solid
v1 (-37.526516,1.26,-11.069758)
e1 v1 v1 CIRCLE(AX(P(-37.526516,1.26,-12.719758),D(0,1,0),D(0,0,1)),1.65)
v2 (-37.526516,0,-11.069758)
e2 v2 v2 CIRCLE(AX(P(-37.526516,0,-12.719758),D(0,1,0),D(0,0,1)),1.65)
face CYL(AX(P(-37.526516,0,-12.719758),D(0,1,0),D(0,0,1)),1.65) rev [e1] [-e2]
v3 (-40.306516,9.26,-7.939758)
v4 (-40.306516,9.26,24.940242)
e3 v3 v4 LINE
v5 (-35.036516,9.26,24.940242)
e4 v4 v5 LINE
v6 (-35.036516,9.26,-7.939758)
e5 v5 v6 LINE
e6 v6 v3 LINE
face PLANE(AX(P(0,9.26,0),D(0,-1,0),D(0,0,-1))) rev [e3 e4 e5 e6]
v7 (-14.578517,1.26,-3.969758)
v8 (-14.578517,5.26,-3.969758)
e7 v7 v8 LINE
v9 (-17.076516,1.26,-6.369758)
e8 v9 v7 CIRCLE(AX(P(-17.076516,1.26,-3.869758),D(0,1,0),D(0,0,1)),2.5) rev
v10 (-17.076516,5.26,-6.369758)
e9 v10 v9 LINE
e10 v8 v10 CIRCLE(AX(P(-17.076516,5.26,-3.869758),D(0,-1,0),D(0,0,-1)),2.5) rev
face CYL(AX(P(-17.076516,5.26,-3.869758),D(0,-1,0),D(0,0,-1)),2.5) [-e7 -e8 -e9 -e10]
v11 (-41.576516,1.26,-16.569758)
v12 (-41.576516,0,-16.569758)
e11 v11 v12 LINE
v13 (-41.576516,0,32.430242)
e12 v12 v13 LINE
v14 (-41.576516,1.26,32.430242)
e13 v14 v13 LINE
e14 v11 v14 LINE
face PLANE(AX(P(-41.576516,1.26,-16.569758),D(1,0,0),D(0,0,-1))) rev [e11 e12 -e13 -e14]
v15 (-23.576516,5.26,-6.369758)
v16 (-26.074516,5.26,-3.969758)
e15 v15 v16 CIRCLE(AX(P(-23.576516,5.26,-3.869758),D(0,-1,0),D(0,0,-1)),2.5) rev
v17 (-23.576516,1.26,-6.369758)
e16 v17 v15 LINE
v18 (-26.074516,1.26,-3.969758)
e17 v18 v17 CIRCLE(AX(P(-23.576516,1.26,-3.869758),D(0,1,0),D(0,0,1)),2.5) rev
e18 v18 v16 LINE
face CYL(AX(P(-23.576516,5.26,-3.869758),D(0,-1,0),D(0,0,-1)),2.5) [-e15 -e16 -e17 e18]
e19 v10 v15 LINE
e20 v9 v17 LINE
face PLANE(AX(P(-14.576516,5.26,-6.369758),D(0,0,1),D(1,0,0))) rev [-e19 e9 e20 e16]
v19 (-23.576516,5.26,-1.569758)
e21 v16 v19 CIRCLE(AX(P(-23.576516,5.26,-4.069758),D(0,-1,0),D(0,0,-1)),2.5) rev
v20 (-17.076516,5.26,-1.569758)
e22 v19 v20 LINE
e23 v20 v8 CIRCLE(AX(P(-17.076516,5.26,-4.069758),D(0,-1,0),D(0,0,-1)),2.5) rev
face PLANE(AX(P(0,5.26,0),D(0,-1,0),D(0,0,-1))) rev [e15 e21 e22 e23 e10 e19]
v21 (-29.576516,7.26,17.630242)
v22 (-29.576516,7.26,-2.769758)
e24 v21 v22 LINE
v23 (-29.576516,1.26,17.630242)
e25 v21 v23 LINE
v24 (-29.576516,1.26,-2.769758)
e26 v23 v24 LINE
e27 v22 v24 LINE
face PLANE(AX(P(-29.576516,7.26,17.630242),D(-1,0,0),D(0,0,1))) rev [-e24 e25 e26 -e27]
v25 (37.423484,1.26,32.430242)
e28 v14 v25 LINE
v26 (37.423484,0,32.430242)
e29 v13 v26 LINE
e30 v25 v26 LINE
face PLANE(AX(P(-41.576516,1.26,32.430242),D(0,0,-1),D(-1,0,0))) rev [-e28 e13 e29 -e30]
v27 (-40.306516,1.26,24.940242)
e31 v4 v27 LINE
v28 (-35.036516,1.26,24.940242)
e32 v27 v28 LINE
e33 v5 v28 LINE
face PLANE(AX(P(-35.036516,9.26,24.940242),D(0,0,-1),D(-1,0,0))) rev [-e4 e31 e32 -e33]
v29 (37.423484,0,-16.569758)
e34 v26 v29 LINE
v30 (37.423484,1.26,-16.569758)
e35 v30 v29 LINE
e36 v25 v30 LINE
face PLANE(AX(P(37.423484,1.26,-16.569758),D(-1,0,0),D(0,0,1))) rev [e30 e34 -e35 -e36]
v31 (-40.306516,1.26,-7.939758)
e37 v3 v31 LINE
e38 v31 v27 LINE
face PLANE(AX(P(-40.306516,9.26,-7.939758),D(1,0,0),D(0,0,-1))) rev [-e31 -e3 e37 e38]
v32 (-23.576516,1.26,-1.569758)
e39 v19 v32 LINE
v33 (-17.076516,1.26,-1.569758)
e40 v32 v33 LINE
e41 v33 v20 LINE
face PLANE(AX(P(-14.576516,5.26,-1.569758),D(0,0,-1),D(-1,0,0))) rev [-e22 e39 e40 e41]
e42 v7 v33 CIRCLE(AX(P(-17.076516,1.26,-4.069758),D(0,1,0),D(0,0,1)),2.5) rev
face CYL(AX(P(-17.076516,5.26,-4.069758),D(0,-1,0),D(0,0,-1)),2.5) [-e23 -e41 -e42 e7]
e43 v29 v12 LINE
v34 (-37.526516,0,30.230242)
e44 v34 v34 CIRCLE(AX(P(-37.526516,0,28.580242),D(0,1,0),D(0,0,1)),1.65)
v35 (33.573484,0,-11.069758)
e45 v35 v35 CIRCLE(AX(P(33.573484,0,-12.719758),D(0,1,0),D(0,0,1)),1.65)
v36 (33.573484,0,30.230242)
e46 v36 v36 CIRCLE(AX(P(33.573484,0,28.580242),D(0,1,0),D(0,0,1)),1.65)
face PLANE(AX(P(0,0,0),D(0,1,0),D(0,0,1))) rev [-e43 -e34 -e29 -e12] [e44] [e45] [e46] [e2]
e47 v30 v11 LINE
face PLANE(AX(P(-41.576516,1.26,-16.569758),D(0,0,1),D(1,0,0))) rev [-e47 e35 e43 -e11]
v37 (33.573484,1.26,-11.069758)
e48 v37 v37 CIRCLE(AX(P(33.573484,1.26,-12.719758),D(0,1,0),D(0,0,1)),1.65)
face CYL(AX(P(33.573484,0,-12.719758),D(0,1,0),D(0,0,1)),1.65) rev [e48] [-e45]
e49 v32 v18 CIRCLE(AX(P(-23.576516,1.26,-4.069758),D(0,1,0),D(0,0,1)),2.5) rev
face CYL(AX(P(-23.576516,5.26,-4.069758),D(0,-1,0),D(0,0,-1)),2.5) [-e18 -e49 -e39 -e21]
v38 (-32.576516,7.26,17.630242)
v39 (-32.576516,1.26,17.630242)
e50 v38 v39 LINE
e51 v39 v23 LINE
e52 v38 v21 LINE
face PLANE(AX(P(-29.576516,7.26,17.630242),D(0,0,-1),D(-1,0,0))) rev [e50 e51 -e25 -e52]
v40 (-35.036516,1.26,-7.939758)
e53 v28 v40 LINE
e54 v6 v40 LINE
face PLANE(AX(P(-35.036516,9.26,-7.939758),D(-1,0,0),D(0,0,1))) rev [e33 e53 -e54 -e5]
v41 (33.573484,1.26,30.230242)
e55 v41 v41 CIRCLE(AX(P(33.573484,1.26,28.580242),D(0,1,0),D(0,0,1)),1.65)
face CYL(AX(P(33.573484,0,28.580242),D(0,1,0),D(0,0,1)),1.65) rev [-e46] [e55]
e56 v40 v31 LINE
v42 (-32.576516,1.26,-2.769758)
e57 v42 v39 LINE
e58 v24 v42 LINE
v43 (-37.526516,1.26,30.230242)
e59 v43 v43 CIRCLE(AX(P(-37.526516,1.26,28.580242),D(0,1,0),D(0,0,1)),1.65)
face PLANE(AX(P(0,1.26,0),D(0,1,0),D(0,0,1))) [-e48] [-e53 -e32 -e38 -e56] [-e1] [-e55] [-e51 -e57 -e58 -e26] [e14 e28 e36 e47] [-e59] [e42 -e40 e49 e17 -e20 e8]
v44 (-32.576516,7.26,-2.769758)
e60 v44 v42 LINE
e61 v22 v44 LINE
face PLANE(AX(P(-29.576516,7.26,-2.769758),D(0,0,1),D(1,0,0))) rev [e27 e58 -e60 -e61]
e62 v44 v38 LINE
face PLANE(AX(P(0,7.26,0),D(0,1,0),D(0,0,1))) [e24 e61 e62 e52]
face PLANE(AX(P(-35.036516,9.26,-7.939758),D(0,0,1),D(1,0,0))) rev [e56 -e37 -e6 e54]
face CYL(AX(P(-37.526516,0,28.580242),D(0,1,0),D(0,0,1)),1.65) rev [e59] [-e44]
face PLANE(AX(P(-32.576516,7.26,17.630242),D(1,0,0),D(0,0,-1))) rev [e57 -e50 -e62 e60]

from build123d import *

# Parameters (mm, degrees)
SKETCH1_W           = 79
SKETCH1_H           = 49
BOSS_EXTRUDE1_DEPTH = 1.26
SKETCH2_R           = 1.65
CUT_EXTRUDE1_DEPTH  = 1.26
SKETCH3_W           = 5.27
SKETCH3_H           = 32.88
BOSS_EXTRUDE2_DEPTH = 8
SKETCH4_W           = 3
SKETCH4_H           = 20.4
BOSS_EXTRUDE3_DEPTH = 6
SKETCH5_W           = 11.5
SKETCH5_H           = 4.8
BOSS_EXTRUDE4_DEPTH = 4
FILLET1_R           = 2.5


with BuildPart() as part:
    # Sketch1 → Boss-Extrude1 (new body)
    with BuildSketch(Plane(origin=(0, 0, 0), x_dir=(1, 0, 0), z_dir=(0, 1, 0))):
        with Locations((-2.076516426, -7.930241605)):
            Rectangle(SKETCH1_W, SKETCH1_H)
    extrude(amount=BOSS_EXTRUDE1_DEPTH)

    # Sketch2 → Cut-Extrude1 (cut)
    with BuildSketch(Plane(origin=(0, 1.26, 0), x_dir=(1, 0, 0), z_dir=(0, 1, 0))):
        with Locations(Location((33.573483574, 12.719758395, 0), (0, 0, 270))):
            Circle(SKETCH2_R)
        with Locations(Location((33.573483574, -28.580241605, 0), (0, 0, 270))):
            Circle(SKETCH2_R)
        with Locations(Location((-37.526516426, -28.580241605, 0), (0, 0, 270))):
            Circle(SKETCH2_R)
        with Locations(Location((-37.526516426, 12.719758395, 0), (0, 0, 270))):
            Circle(SKETCH2_R)
    extrude(amount=-CUT_EXTRUDE1_DEPTH, mode=Mode.SUBTRACT)

    # Sketch3 → Boss-Extrude2 (add)
    with BuildSketch(Plane(origin=(0, 1.26, 0), x_dir=(1, 0, 0), z_dir=(0, 1, 0))):
        with Locations((-37.671516426, -8.500241605)):
            Rectangle(SKETCH3_W, SKETCH3_H)
    extrude(amount=BOSS_EXTRUDE2_DEPTH)

    # Sketch4 → Boss-Extrude3 (add)
    with BuildSketch(Plane(origin=(0, 1.26, 0), x_dir=(1, 0, 0), z_dir=(0, 1, 0))):
        with Locations((-31.076516426, -7.430241605)):
            Rectangle(SKETCH4_W, SKETCH4_H)
    extrude(amount=BOSS_EXTRUDE3_DEPTH)

    # Sketch5 → Boss-Extrude4 (add)
    with BuildSketch(Plane(origin=(0, 1.26, 0), x_dir=(1, 0, 0), z_dir=(0, 1, 0))):
        with Locations((-20.326516426, 3.969758395)):
            Rectangle(SKETCH5_W, SKETCH5_H)
    extrude(amount=BOSS_EXTRUDE4_DEPTH)

    # Fillet1
    # the kernel refuses this fillet: 2.5 mm, written as the material it takes off along each edge
    with BuildSketch(Plane(origin=(-26.076516426, 1.26, -6.369758395), x_dir=(0, 0, 1), z_dir=(0, 1, 0)), Plane(origin=(-26.076516426, 1.26, -1.569758395), x_dir=(1, 0, 0), z_dir=(0, 1, 0)), Plane(origin=(-14.576516426, 1.26, -1.569758395), x_dir=(0, 0, -1), z_dir=(0, 1, 0))) as fillet1_piece_1:
        with BuildLine():
            CenterArc((FILLET1_R, FILLET1_R), FILLET1_R, 180, 90)
            Line((0, FILLET1_R), (0, 0))
            Line((0, 0), (FILLET1_R, 0))
        make_face()
    extrude(amount=10.25, mode=Mode.SUBTRACT)
    with BuildSketch(Plane(origin=(-14.576516426, 1.26, -6.369758395), x_dir=(0, 0, 1), z_dir=(0, 1, 0))) as fillet1_piece_2:
        with BuildLine():
            CenterArc((FILLET1_R, -FILLET1_R), FILLET1_R, 90, 90)
            Line((0, -FILLET1_R), (0, 0))
            Line((0, 0), (FILLET1_R, 0))
        make_face()
    extrude(amount=10.25, mode=Mode.SUBTRACT)


solid = part.part
